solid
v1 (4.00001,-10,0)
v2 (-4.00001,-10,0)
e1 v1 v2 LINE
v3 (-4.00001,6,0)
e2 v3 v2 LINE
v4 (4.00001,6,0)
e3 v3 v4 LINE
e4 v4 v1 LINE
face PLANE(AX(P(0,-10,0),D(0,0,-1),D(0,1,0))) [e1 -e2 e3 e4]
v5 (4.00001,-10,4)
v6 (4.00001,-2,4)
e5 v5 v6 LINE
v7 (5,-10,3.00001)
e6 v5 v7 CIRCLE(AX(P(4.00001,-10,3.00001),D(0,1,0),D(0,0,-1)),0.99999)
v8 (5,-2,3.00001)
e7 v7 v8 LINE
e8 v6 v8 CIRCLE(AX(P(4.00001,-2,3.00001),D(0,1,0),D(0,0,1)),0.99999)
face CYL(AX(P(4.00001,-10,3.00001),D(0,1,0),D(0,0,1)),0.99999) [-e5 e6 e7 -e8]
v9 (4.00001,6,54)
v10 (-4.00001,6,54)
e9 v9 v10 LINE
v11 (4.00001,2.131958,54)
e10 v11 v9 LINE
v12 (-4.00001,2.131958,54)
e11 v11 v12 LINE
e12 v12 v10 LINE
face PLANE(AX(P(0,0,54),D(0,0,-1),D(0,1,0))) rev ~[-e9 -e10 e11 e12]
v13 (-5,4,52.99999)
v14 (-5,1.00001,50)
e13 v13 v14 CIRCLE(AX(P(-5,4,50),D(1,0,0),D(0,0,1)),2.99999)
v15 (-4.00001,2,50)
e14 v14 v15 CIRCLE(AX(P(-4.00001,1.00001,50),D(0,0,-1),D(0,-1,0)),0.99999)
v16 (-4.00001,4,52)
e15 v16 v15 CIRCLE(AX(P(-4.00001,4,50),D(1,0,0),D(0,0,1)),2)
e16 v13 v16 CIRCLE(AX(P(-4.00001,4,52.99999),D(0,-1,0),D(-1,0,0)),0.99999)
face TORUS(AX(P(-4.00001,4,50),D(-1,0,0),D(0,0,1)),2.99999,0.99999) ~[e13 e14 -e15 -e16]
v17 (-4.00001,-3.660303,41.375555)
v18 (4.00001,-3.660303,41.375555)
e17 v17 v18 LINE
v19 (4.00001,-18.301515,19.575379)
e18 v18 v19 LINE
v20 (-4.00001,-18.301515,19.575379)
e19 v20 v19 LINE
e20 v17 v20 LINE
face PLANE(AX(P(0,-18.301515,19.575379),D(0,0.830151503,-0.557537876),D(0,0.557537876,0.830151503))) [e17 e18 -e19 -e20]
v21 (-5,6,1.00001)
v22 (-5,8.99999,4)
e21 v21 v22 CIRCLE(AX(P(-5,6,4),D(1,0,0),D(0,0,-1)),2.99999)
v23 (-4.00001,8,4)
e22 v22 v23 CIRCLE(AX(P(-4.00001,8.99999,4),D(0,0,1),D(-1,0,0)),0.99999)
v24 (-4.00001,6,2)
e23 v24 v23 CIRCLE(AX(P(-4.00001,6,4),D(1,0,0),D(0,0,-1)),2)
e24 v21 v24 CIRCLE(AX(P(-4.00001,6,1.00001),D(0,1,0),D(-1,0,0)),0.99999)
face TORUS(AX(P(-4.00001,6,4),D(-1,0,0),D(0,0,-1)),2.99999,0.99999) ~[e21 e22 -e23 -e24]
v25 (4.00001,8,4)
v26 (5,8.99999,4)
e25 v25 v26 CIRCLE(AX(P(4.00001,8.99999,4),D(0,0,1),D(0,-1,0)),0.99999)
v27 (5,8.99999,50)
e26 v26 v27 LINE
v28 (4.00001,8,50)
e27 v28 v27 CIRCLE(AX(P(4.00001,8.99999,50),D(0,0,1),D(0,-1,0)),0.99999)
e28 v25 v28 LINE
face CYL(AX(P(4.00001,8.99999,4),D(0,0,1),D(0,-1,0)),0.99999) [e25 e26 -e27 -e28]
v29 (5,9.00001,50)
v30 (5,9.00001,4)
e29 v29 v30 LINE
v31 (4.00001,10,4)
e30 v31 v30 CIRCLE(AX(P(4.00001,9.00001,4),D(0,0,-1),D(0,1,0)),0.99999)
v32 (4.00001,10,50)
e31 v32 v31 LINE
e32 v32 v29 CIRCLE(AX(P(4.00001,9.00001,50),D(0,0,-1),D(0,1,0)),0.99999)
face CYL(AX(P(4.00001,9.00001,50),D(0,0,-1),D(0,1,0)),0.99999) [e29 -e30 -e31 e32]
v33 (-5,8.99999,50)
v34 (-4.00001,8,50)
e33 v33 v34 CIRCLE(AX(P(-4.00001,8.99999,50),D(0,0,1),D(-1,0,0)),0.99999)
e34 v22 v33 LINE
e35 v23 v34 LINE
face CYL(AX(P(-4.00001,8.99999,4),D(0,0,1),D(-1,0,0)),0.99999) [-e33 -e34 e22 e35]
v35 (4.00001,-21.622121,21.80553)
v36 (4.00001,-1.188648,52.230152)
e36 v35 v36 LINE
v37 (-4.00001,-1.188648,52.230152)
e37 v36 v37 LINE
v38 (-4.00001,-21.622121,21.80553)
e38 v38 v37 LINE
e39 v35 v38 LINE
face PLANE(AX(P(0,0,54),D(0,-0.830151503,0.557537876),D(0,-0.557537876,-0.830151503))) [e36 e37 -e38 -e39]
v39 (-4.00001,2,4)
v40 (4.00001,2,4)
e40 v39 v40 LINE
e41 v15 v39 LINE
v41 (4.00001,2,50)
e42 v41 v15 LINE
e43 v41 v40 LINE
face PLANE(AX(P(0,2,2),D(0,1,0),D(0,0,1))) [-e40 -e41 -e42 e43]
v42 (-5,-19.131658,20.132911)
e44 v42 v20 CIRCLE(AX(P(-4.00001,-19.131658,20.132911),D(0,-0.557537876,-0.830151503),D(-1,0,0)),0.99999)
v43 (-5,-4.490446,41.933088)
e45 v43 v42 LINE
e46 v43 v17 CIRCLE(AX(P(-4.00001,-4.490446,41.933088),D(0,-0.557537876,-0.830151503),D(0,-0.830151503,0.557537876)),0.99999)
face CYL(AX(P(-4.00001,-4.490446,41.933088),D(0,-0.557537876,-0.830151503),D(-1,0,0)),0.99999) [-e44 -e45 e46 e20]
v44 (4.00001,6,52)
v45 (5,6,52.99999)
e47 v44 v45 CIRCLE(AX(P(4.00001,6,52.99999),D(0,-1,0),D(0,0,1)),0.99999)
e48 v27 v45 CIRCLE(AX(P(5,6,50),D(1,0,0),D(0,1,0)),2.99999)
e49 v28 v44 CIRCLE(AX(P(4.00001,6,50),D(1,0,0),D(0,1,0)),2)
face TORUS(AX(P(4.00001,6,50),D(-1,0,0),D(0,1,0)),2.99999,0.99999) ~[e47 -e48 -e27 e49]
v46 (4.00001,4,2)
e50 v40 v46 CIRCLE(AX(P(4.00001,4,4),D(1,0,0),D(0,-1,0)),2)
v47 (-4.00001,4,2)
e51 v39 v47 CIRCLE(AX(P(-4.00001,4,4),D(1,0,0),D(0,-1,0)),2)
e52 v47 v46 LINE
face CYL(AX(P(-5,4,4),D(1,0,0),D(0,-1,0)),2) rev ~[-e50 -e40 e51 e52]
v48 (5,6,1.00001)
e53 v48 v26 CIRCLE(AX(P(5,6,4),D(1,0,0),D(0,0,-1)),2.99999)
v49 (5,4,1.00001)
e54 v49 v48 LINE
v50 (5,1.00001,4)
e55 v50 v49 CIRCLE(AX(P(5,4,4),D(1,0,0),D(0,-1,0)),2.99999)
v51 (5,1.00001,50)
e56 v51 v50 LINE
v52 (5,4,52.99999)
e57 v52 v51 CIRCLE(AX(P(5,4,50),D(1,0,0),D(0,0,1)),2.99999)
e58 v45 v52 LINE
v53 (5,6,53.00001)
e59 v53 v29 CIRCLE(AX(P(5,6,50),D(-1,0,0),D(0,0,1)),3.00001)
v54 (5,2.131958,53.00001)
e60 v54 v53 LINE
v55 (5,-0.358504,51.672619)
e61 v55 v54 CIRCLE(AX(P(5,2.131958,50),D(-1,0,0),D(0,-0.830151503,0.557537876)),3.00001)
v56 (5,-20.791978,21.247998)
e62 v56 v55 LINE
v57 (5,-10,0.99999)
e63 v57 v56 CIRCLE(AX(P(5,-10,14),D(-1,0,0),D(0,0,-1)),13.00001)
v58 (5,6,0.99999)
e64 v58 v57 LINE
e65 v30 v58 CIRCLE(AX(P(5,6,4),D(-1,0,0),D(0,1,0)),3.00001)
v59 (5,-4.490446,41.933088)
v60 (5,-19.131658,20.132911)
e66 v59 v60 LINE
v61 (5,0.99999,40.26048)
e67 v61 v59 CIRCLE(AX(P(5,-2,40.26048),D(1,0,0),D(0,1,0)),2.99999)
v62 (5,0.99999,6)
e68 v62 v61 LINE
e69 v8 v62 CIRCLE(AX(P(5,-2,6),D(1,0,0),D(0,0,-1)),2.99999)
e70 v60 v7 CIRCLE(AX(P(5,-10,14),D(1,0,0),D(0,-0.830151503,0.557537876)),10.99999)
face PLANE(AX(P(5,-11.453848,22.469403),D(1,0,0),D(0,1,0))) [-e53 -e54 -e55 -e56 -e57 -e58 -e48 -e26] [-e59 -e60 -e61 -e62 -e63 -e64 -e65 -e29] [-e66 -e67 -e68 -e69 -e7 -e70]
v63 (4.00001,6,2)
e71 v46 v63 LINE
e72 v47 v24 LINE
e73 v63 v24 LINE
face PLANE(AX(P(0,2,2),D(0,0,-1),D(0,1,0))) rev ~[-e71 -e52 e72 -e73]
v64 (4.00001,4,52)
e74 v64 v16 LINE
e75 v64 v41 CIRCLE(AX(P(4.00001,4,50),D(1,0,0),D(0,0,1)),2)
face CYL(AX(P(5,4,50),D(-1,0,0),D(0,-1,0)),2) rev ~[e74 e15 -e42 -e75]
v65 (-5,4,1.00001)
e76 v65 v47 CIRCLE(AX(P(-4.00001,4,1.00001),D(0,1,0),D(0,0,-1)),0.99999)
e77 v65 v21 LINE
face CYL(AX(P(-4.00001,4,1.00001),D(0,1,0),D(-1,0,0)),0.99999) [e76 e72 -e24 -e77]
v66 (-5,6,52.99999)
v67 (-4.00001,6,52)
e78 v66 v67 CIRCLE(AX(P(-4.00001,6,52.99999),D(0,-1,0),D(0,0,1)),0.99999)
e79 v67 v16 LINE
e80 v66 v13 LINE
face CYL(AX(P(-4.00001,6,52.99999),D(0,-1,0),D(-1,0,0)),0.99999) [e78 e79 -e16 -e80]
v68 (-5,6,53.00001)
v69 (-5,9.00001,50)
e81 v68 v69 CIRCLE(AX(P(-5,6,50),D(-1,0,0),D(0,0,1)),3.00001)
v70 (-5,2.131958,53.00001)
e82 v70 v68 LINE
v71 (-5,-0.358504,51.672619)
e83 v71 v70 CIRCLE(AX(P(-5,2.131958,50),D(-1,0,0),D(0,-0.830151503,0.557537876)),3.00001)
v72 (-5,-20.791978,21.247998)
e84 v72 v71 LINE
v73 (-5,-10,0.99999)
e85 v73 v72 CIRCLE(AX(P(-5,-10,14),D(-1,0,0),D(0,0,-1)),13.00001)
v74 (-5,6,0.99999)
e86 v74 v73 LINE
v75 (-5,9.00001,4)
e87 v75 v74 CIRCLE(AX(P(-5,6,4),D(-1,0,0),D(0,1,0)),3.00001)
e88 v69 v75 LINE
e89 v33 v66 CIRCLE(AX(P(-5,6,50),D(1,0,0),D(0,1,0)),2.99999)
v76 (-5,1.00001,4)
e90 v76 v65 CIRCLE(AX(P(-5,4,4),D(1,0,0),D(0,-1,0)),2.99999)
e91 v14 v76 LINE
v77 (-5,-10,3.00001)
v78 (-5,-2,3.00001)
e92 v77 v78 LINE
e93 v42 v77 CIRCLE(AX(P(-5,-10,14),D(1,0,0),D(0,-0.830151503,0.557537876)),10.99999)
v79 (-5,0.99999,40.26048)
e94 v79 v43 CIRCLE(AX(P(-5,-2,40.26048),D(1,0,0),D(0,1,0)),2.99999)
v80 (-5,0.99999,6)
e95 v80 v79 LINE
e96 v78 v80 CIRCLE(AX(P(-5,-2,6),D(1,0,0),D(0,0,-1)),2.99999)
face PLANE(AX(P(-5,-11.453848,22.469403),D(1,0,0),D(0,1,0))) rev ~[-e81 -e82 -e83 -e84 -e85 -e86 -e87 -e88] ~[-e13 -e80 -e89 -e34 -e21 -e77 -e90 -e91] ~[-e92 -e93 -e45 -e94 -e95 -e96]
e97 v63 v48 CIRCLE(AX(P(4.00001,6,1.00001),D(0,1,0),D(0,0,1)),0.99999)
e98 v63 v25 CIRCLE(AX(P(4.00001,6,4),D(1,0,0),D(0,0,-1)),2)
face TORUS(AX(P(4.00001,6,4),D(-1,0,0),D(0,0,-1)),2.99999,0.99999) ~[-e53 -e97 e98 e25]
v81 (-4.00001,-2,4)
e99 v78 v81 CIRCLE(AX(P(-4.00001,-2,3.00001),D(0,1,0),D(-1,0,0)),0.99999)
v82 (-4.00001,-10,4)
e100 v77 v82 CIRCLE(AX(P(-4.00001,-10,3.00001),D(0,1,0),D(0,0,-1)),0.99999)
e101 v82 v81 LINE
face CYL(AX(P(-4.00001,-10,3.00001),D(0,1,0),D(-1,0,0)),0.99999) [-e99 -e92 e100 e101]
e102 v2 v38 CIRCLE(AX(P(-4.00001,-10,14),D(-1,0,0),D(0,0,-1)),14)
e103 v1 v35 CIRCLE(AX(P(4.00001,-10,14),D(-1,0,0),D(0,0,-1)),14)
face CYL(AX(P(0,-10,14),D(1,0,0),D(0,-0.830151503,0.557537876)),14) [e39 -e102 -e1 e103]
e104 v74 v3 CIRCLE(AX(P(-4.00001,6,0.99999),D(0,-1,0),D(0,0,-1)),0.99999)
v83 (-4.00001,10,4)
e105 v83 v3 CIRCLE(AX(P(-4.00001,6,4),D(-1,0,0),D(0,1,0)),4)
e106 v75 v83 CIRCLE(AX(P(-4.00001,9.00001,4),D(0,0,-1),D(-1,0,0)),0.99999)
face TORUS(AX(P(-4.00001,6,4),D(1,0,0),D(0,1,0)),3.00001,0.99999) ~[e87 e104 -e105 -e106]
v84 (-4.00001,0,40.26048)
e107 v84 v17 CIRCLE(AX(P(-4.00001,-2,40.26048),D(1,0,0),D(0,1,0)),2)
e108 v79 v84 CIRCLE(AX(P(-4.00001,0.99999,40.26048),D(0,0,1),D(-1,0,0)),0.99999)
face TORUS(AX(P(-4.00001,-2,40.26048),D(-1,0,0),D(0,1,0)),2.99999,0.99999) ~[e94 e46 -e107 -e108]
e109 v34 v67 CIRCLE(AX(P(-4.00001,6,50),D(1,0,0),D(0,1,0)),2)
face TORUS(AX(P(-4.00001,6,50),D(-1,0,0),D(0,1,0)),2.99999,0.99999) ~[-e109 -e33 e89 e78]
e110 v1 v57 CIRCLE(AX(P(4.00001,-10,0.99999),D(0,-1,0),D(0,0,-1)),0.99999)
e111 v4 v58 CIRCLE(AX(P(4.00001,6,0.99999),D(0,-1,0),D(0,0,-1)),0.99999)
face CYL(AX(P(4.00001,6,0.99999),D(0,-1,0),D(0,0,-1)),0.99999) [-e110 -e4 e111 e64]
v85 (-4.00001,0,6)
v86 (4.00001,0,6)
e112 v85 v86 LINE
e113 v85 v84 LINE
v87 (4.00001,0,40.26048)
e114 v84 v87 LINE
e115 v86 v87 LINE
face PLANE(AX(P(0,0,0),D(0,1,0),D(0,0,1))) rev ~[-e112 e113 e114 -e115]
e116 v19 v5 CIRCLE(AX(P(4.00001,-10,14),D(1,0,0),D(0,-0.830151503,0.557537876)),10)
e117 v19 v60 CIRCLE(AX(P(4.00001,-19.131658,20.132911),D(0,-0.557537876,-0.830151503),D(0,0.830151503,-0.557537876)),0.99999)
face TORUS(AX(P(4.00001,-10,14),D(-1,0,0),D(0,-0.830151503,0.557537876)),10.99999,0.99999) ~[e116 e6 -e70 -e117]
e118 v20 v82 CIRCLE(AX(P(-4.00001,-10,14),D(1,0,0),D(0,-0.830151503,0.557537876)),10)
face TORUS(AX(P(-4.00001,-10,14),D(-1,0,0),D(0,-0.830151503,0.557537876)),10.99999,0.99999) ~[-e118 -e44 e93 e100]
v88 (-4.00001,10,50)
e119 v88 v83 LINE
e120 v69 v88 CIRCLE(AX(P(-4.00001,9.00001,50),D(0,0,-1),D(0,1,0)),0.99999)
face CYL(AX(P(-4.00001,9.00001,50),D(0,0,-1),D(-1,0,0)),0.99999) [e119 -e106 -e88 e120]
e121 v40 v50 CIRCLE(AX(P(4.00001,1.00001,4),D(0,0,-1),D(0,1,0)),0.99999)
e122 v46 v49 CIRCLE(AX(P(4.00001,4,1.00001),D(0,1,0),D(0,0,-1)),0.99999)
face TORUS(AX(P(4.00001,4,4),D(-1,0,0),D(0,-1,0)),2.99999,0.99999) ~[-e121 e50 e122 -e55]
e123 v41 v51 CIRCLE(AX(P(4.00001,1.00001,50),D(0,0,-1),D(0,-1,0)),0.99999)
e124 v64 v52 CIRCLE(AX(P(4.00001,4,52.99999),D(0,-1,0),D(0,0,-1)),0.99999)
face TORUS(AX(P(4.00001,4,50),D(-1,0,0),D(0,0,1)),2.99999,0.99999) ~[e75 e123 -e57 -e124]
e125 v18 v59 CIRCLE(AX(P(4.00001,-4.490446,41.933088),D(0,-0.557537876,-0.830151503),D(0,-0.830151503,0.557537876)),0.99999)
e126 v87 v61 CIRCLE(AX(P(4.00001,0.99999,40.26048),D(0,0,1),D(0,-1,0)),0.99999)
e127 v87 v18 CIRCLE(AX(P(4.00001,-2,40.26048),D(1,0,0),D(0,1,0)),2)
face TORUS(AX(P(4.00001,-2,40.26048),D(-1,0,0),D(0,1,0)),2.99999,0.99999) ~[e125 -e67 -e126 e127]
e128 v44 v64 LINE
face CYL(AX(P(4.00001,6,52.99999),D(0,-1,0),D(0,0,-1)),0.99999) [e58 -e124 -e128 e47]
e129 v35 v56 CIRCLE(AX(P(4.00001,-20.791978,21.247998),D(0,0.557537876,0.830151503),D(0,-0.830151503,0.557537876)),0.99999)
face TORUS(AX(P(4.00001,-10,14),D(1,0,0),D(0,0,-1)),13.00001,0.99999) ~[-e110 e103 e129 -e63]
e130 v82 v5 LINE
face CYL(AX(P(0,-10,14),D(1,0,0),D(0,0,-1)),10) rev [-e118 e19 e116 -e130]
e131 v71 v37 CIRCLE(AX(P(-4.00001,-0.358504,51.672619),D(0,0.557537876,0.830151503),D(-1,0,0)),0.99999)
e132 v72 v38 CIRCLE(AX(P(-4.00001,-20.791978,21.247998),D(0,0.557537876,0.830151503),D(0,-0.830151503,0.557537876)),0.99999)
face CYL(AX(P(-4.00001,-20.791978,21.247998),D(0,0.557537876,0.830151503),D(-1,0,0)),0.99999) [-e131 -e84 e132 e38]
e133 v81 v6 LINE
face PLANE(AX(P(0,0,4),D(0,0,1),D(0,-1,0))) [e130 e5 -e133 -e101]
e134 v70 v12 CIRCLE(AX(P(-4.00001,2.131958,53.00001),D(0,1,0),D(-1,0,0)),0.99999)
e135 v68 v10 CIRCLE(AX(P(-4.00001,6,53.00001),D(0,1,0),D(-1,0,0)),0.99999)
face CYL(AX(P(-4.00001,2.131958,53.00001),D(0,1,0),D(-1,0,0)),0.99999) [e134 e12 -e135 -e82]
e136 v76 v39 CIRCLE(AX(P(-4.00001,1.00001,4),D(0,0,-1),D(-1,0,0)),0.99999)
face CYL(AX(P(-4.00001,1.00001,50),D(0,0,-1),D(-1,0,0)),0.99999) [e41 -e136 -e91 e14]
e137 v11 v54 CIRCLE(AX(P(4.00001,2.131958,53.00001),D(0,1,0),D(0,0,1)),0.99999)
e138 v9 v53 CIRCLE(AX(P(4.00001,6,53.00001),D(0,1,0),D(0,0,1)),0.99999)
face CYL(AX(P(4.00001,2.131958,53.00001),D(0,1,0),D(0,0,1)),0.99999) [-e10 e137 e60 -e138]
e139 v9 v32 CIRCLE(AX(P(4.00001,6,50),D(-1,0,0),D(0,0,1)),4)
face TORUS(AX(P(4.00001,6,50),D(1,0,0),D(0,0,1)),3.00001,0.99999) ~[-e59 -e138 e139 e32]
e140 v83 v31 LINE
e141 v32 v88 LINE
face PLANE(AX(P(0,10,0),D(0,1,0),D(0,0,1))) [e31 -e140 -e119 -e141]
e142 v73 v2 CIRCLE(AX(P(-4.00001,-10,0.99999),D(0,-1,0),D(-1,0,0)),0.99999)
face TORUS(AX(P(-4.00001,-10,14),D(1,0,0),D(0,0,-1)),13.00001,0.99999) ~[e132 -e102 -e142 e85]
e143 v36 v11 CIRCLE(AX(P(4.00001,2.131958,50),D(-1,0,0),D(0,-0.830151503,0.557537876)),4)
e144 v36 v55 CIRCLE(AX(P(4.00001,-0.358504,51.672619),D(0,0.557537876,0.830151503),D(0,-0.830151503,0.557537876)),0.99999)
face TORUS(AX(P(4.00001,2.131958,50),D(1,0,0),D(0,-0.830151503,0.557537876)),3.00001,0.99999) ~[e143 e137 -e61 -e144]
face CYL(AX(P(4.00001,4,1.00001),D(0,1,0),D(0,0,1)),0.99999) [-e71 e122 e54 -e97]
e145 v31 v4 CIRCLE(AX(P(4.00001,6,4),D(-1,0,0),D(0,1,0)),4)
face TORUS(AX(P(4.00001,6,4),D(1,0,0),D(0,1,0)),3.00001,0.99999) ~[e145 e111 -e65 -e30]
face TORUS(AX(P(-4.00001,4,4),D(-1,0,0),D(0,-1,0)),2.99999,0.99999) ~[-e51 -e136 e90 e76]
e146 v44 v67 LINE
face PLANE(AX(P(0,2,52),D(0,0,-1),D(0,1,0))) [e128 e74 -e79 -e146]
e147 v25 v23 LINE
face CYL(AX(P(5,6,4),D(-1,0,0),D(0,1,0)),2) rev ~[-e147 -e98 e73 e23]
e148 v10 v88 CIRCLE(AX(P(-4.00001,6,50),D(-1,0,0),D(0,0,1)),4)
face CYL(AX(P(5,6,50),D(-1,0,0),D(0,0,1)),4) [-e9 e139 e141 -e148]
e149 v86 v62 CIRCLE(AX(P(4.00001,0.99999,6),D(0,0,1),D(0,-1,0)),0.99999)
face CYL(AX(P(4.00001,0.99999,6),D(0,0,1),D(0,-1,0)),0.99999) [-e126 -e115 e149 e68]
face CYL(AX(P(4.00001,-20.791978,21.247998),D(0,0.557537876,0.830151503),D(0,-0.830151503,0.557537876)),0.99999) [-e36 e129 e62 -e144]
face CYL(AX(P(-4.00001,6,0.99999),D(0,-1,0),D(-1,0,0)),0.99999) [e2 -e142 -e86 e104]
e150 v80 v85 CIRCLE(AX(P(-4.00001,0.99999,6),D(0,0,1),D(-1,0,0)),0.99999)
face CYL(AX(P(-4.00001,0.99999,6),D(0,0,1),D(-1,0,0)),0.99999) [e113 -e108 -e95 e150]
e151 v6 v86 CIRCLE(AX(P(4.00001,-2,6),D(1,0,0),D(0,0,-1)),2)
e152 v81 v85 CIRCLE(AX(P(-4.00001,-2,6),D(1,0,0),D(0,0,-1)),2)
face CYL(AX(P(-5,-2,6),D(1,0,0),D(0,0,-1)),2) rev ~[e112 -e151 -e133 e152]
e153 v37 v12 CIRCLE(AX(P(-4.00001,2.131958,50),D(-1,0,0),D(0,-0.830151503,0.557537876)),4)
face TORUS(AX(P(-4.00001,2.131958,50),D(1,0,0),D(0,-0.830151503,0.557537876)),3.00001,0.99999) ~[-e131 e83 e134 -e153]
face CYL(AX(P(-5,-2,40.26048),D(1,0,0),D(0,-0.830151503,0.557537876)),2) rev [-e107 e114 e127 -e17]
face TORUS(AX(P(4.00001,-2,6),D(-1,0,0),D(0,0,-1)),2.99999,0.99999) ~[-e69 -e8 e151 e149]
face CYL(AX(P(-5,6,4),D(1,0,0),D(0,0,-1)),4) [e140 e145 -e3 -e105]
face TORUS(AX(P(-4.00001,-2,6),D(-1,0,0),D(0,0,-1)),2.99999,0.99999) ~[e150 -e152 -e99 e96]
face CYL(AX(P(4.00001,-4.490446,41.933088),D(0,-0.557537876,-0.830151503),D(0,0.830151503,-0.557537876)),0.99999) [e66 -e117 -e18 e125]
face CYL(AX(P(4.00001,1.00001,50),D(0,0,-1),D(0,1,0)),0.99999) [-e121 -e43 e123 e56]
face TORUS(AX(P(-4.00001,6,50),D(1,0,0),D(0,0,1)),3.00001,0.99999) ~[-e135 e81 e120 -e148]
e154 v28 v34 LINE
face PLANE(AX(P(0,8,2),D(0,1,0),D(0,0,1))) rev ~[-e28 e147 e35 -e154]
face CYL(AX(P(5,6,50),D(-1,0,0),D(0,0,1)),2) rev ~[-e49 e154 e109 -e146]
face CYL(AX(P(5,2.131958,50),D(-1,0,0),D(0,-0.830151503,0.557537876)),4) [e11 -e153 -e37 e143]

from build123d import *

# Parameters (mm, degrees)
F2_W     = 10
F2_H     = 54
F2_W_2   = 6
F2_H_2   = 50
F3_DEPTH = 5
F5_DEPTH = 5
F6_R     = 4
F7_R     = 2
F8_R     = 0.99999


# Not quite as in the source:
# - a fillet or chamfer is up to 0.001 mm smaller than in the source, because OpenCascade refuses the exact size


with BuildPart() as f3:
    # F2 (on Right) → F3 (new body, symmetric)
    with BuildSketch(Plane.YZ):
        with Locations((5, 27)):
            Rectangle(F2_W, F2_H)
        with Locations((5, 27)):
            Rectangle(F2_W_2, F2_H_2, mode=Mode.SUBTRACT)
    extrude(amount=F3_DEPTH, both=True)

    # F4 (on Right) → F5 (join, symmetric)
    with BuildSketch(Plane.YZ):
        with BuildLine():
            Line((0, 0), (0, 4))
            Line((0, 4), (-10, 4))
            ThreePointArc((-10, 4), (-18.824788597, 9.2964793805), (-18.3015150257, 19.5753787564))
            Line((-18.3015150257, 19.5753787564), (0, 46.8255995247))
            Line((0, 46.8255995247), (0, 54))
            Line((0, 54), (-21.622121036, 21.805530259))
            ThreePointArc((-21.622121036, 21.805530259), (-22.3547040358, 7.4150711327), (-10, 0))
            Line((-10, 0), (0, 0))
        make_face()
    extrude(amount=F5_DEPTH, both=True)

    # F6
    f6_edges = [f3.edges().sort_by_distance(p)[0] for p in [
        (0, 10, 54),
        (0, 0, 54),
        (0, 10, 0),
    ]]
    fillet(f6_edges, radius=F6_R)

    # F7
    f7_edges = [f3.edges().sort_by_distance(p)[0] for p in [
        (0, 8, 52),
        (0, 2, 52),
        (0, 8, 2),
        (0, 2, 2),
        (0, 0, 4),
        (0, 0, 46.8256),
    ]]
    fillet(f7_edges, radius=F7_R)

    # F8 (radius 1 in the source; OpenCascade refuses exactly that, so slightly less here)
    f8_edges = [f3.edges().sort_by_distance(p)[0] for p in [
        (5, 0, 23.13024),
        (5, -1.417165, 42.173671),
        (5, -0.585786, 4.585786),
        (5, -10.980909, 30.475467),
        (5, -6, 4),
        (5, -18.824789, 9.296479),
        (5, 4.065979, 54),
        (5, 8.828427, 52.828427),
        (5, 0.25055, 53.529915),
        (5, 10, 27),
        (5, -11.405384, 37.017841),
        (5, 8.828427, 1.171573),
        (5, -22.354704, 7.415071),
        (5, -2, 0),
        (5, 8, 27),
        (5, 7.414214, 51.414214),
        (5, 7.414214, 2.585786),
        (5, 5, 52),
        (5, 5, 2),
        (5, 2.585786, 51.414214),
        (5, 2.585786, 2.585786),
        (5, 2, 27),
        (-5, 0, 23.13024),
        (-5, -1.417165, 42.173671),
        (-5, -0.585786, 4.585786),
        (-5, -10.980909, 30.475467),
        (-5, -6, 4),
        (-5, -18.824789, 9.296479),
        (-5, 4.065979, 54),
        (-5, 8.828427, 52.828427),
        (-5, 0.25055, 53.529915),
        (-5, 10, 27),
        (-5, -11.405384, 37.017841),
        (-5, 8.828427, 1.171573),
        (-5, -22.354704, 7.415071),
        (-5, -2, 0),
        (-5, 8, 27),
        (-5, 7.414214, 51.414214),
        (-5, 7.414214, 2.585786),
        (-5, 5, 52),
        (-5, 5, 2),
        (-5, 2.585786, 51.414214),
        (-5, 2.585786, 2.585786),
        (-5, 2, 27),
    ]]
    fillet(f8_edges, radius=F8_R)


solid = f3.part
